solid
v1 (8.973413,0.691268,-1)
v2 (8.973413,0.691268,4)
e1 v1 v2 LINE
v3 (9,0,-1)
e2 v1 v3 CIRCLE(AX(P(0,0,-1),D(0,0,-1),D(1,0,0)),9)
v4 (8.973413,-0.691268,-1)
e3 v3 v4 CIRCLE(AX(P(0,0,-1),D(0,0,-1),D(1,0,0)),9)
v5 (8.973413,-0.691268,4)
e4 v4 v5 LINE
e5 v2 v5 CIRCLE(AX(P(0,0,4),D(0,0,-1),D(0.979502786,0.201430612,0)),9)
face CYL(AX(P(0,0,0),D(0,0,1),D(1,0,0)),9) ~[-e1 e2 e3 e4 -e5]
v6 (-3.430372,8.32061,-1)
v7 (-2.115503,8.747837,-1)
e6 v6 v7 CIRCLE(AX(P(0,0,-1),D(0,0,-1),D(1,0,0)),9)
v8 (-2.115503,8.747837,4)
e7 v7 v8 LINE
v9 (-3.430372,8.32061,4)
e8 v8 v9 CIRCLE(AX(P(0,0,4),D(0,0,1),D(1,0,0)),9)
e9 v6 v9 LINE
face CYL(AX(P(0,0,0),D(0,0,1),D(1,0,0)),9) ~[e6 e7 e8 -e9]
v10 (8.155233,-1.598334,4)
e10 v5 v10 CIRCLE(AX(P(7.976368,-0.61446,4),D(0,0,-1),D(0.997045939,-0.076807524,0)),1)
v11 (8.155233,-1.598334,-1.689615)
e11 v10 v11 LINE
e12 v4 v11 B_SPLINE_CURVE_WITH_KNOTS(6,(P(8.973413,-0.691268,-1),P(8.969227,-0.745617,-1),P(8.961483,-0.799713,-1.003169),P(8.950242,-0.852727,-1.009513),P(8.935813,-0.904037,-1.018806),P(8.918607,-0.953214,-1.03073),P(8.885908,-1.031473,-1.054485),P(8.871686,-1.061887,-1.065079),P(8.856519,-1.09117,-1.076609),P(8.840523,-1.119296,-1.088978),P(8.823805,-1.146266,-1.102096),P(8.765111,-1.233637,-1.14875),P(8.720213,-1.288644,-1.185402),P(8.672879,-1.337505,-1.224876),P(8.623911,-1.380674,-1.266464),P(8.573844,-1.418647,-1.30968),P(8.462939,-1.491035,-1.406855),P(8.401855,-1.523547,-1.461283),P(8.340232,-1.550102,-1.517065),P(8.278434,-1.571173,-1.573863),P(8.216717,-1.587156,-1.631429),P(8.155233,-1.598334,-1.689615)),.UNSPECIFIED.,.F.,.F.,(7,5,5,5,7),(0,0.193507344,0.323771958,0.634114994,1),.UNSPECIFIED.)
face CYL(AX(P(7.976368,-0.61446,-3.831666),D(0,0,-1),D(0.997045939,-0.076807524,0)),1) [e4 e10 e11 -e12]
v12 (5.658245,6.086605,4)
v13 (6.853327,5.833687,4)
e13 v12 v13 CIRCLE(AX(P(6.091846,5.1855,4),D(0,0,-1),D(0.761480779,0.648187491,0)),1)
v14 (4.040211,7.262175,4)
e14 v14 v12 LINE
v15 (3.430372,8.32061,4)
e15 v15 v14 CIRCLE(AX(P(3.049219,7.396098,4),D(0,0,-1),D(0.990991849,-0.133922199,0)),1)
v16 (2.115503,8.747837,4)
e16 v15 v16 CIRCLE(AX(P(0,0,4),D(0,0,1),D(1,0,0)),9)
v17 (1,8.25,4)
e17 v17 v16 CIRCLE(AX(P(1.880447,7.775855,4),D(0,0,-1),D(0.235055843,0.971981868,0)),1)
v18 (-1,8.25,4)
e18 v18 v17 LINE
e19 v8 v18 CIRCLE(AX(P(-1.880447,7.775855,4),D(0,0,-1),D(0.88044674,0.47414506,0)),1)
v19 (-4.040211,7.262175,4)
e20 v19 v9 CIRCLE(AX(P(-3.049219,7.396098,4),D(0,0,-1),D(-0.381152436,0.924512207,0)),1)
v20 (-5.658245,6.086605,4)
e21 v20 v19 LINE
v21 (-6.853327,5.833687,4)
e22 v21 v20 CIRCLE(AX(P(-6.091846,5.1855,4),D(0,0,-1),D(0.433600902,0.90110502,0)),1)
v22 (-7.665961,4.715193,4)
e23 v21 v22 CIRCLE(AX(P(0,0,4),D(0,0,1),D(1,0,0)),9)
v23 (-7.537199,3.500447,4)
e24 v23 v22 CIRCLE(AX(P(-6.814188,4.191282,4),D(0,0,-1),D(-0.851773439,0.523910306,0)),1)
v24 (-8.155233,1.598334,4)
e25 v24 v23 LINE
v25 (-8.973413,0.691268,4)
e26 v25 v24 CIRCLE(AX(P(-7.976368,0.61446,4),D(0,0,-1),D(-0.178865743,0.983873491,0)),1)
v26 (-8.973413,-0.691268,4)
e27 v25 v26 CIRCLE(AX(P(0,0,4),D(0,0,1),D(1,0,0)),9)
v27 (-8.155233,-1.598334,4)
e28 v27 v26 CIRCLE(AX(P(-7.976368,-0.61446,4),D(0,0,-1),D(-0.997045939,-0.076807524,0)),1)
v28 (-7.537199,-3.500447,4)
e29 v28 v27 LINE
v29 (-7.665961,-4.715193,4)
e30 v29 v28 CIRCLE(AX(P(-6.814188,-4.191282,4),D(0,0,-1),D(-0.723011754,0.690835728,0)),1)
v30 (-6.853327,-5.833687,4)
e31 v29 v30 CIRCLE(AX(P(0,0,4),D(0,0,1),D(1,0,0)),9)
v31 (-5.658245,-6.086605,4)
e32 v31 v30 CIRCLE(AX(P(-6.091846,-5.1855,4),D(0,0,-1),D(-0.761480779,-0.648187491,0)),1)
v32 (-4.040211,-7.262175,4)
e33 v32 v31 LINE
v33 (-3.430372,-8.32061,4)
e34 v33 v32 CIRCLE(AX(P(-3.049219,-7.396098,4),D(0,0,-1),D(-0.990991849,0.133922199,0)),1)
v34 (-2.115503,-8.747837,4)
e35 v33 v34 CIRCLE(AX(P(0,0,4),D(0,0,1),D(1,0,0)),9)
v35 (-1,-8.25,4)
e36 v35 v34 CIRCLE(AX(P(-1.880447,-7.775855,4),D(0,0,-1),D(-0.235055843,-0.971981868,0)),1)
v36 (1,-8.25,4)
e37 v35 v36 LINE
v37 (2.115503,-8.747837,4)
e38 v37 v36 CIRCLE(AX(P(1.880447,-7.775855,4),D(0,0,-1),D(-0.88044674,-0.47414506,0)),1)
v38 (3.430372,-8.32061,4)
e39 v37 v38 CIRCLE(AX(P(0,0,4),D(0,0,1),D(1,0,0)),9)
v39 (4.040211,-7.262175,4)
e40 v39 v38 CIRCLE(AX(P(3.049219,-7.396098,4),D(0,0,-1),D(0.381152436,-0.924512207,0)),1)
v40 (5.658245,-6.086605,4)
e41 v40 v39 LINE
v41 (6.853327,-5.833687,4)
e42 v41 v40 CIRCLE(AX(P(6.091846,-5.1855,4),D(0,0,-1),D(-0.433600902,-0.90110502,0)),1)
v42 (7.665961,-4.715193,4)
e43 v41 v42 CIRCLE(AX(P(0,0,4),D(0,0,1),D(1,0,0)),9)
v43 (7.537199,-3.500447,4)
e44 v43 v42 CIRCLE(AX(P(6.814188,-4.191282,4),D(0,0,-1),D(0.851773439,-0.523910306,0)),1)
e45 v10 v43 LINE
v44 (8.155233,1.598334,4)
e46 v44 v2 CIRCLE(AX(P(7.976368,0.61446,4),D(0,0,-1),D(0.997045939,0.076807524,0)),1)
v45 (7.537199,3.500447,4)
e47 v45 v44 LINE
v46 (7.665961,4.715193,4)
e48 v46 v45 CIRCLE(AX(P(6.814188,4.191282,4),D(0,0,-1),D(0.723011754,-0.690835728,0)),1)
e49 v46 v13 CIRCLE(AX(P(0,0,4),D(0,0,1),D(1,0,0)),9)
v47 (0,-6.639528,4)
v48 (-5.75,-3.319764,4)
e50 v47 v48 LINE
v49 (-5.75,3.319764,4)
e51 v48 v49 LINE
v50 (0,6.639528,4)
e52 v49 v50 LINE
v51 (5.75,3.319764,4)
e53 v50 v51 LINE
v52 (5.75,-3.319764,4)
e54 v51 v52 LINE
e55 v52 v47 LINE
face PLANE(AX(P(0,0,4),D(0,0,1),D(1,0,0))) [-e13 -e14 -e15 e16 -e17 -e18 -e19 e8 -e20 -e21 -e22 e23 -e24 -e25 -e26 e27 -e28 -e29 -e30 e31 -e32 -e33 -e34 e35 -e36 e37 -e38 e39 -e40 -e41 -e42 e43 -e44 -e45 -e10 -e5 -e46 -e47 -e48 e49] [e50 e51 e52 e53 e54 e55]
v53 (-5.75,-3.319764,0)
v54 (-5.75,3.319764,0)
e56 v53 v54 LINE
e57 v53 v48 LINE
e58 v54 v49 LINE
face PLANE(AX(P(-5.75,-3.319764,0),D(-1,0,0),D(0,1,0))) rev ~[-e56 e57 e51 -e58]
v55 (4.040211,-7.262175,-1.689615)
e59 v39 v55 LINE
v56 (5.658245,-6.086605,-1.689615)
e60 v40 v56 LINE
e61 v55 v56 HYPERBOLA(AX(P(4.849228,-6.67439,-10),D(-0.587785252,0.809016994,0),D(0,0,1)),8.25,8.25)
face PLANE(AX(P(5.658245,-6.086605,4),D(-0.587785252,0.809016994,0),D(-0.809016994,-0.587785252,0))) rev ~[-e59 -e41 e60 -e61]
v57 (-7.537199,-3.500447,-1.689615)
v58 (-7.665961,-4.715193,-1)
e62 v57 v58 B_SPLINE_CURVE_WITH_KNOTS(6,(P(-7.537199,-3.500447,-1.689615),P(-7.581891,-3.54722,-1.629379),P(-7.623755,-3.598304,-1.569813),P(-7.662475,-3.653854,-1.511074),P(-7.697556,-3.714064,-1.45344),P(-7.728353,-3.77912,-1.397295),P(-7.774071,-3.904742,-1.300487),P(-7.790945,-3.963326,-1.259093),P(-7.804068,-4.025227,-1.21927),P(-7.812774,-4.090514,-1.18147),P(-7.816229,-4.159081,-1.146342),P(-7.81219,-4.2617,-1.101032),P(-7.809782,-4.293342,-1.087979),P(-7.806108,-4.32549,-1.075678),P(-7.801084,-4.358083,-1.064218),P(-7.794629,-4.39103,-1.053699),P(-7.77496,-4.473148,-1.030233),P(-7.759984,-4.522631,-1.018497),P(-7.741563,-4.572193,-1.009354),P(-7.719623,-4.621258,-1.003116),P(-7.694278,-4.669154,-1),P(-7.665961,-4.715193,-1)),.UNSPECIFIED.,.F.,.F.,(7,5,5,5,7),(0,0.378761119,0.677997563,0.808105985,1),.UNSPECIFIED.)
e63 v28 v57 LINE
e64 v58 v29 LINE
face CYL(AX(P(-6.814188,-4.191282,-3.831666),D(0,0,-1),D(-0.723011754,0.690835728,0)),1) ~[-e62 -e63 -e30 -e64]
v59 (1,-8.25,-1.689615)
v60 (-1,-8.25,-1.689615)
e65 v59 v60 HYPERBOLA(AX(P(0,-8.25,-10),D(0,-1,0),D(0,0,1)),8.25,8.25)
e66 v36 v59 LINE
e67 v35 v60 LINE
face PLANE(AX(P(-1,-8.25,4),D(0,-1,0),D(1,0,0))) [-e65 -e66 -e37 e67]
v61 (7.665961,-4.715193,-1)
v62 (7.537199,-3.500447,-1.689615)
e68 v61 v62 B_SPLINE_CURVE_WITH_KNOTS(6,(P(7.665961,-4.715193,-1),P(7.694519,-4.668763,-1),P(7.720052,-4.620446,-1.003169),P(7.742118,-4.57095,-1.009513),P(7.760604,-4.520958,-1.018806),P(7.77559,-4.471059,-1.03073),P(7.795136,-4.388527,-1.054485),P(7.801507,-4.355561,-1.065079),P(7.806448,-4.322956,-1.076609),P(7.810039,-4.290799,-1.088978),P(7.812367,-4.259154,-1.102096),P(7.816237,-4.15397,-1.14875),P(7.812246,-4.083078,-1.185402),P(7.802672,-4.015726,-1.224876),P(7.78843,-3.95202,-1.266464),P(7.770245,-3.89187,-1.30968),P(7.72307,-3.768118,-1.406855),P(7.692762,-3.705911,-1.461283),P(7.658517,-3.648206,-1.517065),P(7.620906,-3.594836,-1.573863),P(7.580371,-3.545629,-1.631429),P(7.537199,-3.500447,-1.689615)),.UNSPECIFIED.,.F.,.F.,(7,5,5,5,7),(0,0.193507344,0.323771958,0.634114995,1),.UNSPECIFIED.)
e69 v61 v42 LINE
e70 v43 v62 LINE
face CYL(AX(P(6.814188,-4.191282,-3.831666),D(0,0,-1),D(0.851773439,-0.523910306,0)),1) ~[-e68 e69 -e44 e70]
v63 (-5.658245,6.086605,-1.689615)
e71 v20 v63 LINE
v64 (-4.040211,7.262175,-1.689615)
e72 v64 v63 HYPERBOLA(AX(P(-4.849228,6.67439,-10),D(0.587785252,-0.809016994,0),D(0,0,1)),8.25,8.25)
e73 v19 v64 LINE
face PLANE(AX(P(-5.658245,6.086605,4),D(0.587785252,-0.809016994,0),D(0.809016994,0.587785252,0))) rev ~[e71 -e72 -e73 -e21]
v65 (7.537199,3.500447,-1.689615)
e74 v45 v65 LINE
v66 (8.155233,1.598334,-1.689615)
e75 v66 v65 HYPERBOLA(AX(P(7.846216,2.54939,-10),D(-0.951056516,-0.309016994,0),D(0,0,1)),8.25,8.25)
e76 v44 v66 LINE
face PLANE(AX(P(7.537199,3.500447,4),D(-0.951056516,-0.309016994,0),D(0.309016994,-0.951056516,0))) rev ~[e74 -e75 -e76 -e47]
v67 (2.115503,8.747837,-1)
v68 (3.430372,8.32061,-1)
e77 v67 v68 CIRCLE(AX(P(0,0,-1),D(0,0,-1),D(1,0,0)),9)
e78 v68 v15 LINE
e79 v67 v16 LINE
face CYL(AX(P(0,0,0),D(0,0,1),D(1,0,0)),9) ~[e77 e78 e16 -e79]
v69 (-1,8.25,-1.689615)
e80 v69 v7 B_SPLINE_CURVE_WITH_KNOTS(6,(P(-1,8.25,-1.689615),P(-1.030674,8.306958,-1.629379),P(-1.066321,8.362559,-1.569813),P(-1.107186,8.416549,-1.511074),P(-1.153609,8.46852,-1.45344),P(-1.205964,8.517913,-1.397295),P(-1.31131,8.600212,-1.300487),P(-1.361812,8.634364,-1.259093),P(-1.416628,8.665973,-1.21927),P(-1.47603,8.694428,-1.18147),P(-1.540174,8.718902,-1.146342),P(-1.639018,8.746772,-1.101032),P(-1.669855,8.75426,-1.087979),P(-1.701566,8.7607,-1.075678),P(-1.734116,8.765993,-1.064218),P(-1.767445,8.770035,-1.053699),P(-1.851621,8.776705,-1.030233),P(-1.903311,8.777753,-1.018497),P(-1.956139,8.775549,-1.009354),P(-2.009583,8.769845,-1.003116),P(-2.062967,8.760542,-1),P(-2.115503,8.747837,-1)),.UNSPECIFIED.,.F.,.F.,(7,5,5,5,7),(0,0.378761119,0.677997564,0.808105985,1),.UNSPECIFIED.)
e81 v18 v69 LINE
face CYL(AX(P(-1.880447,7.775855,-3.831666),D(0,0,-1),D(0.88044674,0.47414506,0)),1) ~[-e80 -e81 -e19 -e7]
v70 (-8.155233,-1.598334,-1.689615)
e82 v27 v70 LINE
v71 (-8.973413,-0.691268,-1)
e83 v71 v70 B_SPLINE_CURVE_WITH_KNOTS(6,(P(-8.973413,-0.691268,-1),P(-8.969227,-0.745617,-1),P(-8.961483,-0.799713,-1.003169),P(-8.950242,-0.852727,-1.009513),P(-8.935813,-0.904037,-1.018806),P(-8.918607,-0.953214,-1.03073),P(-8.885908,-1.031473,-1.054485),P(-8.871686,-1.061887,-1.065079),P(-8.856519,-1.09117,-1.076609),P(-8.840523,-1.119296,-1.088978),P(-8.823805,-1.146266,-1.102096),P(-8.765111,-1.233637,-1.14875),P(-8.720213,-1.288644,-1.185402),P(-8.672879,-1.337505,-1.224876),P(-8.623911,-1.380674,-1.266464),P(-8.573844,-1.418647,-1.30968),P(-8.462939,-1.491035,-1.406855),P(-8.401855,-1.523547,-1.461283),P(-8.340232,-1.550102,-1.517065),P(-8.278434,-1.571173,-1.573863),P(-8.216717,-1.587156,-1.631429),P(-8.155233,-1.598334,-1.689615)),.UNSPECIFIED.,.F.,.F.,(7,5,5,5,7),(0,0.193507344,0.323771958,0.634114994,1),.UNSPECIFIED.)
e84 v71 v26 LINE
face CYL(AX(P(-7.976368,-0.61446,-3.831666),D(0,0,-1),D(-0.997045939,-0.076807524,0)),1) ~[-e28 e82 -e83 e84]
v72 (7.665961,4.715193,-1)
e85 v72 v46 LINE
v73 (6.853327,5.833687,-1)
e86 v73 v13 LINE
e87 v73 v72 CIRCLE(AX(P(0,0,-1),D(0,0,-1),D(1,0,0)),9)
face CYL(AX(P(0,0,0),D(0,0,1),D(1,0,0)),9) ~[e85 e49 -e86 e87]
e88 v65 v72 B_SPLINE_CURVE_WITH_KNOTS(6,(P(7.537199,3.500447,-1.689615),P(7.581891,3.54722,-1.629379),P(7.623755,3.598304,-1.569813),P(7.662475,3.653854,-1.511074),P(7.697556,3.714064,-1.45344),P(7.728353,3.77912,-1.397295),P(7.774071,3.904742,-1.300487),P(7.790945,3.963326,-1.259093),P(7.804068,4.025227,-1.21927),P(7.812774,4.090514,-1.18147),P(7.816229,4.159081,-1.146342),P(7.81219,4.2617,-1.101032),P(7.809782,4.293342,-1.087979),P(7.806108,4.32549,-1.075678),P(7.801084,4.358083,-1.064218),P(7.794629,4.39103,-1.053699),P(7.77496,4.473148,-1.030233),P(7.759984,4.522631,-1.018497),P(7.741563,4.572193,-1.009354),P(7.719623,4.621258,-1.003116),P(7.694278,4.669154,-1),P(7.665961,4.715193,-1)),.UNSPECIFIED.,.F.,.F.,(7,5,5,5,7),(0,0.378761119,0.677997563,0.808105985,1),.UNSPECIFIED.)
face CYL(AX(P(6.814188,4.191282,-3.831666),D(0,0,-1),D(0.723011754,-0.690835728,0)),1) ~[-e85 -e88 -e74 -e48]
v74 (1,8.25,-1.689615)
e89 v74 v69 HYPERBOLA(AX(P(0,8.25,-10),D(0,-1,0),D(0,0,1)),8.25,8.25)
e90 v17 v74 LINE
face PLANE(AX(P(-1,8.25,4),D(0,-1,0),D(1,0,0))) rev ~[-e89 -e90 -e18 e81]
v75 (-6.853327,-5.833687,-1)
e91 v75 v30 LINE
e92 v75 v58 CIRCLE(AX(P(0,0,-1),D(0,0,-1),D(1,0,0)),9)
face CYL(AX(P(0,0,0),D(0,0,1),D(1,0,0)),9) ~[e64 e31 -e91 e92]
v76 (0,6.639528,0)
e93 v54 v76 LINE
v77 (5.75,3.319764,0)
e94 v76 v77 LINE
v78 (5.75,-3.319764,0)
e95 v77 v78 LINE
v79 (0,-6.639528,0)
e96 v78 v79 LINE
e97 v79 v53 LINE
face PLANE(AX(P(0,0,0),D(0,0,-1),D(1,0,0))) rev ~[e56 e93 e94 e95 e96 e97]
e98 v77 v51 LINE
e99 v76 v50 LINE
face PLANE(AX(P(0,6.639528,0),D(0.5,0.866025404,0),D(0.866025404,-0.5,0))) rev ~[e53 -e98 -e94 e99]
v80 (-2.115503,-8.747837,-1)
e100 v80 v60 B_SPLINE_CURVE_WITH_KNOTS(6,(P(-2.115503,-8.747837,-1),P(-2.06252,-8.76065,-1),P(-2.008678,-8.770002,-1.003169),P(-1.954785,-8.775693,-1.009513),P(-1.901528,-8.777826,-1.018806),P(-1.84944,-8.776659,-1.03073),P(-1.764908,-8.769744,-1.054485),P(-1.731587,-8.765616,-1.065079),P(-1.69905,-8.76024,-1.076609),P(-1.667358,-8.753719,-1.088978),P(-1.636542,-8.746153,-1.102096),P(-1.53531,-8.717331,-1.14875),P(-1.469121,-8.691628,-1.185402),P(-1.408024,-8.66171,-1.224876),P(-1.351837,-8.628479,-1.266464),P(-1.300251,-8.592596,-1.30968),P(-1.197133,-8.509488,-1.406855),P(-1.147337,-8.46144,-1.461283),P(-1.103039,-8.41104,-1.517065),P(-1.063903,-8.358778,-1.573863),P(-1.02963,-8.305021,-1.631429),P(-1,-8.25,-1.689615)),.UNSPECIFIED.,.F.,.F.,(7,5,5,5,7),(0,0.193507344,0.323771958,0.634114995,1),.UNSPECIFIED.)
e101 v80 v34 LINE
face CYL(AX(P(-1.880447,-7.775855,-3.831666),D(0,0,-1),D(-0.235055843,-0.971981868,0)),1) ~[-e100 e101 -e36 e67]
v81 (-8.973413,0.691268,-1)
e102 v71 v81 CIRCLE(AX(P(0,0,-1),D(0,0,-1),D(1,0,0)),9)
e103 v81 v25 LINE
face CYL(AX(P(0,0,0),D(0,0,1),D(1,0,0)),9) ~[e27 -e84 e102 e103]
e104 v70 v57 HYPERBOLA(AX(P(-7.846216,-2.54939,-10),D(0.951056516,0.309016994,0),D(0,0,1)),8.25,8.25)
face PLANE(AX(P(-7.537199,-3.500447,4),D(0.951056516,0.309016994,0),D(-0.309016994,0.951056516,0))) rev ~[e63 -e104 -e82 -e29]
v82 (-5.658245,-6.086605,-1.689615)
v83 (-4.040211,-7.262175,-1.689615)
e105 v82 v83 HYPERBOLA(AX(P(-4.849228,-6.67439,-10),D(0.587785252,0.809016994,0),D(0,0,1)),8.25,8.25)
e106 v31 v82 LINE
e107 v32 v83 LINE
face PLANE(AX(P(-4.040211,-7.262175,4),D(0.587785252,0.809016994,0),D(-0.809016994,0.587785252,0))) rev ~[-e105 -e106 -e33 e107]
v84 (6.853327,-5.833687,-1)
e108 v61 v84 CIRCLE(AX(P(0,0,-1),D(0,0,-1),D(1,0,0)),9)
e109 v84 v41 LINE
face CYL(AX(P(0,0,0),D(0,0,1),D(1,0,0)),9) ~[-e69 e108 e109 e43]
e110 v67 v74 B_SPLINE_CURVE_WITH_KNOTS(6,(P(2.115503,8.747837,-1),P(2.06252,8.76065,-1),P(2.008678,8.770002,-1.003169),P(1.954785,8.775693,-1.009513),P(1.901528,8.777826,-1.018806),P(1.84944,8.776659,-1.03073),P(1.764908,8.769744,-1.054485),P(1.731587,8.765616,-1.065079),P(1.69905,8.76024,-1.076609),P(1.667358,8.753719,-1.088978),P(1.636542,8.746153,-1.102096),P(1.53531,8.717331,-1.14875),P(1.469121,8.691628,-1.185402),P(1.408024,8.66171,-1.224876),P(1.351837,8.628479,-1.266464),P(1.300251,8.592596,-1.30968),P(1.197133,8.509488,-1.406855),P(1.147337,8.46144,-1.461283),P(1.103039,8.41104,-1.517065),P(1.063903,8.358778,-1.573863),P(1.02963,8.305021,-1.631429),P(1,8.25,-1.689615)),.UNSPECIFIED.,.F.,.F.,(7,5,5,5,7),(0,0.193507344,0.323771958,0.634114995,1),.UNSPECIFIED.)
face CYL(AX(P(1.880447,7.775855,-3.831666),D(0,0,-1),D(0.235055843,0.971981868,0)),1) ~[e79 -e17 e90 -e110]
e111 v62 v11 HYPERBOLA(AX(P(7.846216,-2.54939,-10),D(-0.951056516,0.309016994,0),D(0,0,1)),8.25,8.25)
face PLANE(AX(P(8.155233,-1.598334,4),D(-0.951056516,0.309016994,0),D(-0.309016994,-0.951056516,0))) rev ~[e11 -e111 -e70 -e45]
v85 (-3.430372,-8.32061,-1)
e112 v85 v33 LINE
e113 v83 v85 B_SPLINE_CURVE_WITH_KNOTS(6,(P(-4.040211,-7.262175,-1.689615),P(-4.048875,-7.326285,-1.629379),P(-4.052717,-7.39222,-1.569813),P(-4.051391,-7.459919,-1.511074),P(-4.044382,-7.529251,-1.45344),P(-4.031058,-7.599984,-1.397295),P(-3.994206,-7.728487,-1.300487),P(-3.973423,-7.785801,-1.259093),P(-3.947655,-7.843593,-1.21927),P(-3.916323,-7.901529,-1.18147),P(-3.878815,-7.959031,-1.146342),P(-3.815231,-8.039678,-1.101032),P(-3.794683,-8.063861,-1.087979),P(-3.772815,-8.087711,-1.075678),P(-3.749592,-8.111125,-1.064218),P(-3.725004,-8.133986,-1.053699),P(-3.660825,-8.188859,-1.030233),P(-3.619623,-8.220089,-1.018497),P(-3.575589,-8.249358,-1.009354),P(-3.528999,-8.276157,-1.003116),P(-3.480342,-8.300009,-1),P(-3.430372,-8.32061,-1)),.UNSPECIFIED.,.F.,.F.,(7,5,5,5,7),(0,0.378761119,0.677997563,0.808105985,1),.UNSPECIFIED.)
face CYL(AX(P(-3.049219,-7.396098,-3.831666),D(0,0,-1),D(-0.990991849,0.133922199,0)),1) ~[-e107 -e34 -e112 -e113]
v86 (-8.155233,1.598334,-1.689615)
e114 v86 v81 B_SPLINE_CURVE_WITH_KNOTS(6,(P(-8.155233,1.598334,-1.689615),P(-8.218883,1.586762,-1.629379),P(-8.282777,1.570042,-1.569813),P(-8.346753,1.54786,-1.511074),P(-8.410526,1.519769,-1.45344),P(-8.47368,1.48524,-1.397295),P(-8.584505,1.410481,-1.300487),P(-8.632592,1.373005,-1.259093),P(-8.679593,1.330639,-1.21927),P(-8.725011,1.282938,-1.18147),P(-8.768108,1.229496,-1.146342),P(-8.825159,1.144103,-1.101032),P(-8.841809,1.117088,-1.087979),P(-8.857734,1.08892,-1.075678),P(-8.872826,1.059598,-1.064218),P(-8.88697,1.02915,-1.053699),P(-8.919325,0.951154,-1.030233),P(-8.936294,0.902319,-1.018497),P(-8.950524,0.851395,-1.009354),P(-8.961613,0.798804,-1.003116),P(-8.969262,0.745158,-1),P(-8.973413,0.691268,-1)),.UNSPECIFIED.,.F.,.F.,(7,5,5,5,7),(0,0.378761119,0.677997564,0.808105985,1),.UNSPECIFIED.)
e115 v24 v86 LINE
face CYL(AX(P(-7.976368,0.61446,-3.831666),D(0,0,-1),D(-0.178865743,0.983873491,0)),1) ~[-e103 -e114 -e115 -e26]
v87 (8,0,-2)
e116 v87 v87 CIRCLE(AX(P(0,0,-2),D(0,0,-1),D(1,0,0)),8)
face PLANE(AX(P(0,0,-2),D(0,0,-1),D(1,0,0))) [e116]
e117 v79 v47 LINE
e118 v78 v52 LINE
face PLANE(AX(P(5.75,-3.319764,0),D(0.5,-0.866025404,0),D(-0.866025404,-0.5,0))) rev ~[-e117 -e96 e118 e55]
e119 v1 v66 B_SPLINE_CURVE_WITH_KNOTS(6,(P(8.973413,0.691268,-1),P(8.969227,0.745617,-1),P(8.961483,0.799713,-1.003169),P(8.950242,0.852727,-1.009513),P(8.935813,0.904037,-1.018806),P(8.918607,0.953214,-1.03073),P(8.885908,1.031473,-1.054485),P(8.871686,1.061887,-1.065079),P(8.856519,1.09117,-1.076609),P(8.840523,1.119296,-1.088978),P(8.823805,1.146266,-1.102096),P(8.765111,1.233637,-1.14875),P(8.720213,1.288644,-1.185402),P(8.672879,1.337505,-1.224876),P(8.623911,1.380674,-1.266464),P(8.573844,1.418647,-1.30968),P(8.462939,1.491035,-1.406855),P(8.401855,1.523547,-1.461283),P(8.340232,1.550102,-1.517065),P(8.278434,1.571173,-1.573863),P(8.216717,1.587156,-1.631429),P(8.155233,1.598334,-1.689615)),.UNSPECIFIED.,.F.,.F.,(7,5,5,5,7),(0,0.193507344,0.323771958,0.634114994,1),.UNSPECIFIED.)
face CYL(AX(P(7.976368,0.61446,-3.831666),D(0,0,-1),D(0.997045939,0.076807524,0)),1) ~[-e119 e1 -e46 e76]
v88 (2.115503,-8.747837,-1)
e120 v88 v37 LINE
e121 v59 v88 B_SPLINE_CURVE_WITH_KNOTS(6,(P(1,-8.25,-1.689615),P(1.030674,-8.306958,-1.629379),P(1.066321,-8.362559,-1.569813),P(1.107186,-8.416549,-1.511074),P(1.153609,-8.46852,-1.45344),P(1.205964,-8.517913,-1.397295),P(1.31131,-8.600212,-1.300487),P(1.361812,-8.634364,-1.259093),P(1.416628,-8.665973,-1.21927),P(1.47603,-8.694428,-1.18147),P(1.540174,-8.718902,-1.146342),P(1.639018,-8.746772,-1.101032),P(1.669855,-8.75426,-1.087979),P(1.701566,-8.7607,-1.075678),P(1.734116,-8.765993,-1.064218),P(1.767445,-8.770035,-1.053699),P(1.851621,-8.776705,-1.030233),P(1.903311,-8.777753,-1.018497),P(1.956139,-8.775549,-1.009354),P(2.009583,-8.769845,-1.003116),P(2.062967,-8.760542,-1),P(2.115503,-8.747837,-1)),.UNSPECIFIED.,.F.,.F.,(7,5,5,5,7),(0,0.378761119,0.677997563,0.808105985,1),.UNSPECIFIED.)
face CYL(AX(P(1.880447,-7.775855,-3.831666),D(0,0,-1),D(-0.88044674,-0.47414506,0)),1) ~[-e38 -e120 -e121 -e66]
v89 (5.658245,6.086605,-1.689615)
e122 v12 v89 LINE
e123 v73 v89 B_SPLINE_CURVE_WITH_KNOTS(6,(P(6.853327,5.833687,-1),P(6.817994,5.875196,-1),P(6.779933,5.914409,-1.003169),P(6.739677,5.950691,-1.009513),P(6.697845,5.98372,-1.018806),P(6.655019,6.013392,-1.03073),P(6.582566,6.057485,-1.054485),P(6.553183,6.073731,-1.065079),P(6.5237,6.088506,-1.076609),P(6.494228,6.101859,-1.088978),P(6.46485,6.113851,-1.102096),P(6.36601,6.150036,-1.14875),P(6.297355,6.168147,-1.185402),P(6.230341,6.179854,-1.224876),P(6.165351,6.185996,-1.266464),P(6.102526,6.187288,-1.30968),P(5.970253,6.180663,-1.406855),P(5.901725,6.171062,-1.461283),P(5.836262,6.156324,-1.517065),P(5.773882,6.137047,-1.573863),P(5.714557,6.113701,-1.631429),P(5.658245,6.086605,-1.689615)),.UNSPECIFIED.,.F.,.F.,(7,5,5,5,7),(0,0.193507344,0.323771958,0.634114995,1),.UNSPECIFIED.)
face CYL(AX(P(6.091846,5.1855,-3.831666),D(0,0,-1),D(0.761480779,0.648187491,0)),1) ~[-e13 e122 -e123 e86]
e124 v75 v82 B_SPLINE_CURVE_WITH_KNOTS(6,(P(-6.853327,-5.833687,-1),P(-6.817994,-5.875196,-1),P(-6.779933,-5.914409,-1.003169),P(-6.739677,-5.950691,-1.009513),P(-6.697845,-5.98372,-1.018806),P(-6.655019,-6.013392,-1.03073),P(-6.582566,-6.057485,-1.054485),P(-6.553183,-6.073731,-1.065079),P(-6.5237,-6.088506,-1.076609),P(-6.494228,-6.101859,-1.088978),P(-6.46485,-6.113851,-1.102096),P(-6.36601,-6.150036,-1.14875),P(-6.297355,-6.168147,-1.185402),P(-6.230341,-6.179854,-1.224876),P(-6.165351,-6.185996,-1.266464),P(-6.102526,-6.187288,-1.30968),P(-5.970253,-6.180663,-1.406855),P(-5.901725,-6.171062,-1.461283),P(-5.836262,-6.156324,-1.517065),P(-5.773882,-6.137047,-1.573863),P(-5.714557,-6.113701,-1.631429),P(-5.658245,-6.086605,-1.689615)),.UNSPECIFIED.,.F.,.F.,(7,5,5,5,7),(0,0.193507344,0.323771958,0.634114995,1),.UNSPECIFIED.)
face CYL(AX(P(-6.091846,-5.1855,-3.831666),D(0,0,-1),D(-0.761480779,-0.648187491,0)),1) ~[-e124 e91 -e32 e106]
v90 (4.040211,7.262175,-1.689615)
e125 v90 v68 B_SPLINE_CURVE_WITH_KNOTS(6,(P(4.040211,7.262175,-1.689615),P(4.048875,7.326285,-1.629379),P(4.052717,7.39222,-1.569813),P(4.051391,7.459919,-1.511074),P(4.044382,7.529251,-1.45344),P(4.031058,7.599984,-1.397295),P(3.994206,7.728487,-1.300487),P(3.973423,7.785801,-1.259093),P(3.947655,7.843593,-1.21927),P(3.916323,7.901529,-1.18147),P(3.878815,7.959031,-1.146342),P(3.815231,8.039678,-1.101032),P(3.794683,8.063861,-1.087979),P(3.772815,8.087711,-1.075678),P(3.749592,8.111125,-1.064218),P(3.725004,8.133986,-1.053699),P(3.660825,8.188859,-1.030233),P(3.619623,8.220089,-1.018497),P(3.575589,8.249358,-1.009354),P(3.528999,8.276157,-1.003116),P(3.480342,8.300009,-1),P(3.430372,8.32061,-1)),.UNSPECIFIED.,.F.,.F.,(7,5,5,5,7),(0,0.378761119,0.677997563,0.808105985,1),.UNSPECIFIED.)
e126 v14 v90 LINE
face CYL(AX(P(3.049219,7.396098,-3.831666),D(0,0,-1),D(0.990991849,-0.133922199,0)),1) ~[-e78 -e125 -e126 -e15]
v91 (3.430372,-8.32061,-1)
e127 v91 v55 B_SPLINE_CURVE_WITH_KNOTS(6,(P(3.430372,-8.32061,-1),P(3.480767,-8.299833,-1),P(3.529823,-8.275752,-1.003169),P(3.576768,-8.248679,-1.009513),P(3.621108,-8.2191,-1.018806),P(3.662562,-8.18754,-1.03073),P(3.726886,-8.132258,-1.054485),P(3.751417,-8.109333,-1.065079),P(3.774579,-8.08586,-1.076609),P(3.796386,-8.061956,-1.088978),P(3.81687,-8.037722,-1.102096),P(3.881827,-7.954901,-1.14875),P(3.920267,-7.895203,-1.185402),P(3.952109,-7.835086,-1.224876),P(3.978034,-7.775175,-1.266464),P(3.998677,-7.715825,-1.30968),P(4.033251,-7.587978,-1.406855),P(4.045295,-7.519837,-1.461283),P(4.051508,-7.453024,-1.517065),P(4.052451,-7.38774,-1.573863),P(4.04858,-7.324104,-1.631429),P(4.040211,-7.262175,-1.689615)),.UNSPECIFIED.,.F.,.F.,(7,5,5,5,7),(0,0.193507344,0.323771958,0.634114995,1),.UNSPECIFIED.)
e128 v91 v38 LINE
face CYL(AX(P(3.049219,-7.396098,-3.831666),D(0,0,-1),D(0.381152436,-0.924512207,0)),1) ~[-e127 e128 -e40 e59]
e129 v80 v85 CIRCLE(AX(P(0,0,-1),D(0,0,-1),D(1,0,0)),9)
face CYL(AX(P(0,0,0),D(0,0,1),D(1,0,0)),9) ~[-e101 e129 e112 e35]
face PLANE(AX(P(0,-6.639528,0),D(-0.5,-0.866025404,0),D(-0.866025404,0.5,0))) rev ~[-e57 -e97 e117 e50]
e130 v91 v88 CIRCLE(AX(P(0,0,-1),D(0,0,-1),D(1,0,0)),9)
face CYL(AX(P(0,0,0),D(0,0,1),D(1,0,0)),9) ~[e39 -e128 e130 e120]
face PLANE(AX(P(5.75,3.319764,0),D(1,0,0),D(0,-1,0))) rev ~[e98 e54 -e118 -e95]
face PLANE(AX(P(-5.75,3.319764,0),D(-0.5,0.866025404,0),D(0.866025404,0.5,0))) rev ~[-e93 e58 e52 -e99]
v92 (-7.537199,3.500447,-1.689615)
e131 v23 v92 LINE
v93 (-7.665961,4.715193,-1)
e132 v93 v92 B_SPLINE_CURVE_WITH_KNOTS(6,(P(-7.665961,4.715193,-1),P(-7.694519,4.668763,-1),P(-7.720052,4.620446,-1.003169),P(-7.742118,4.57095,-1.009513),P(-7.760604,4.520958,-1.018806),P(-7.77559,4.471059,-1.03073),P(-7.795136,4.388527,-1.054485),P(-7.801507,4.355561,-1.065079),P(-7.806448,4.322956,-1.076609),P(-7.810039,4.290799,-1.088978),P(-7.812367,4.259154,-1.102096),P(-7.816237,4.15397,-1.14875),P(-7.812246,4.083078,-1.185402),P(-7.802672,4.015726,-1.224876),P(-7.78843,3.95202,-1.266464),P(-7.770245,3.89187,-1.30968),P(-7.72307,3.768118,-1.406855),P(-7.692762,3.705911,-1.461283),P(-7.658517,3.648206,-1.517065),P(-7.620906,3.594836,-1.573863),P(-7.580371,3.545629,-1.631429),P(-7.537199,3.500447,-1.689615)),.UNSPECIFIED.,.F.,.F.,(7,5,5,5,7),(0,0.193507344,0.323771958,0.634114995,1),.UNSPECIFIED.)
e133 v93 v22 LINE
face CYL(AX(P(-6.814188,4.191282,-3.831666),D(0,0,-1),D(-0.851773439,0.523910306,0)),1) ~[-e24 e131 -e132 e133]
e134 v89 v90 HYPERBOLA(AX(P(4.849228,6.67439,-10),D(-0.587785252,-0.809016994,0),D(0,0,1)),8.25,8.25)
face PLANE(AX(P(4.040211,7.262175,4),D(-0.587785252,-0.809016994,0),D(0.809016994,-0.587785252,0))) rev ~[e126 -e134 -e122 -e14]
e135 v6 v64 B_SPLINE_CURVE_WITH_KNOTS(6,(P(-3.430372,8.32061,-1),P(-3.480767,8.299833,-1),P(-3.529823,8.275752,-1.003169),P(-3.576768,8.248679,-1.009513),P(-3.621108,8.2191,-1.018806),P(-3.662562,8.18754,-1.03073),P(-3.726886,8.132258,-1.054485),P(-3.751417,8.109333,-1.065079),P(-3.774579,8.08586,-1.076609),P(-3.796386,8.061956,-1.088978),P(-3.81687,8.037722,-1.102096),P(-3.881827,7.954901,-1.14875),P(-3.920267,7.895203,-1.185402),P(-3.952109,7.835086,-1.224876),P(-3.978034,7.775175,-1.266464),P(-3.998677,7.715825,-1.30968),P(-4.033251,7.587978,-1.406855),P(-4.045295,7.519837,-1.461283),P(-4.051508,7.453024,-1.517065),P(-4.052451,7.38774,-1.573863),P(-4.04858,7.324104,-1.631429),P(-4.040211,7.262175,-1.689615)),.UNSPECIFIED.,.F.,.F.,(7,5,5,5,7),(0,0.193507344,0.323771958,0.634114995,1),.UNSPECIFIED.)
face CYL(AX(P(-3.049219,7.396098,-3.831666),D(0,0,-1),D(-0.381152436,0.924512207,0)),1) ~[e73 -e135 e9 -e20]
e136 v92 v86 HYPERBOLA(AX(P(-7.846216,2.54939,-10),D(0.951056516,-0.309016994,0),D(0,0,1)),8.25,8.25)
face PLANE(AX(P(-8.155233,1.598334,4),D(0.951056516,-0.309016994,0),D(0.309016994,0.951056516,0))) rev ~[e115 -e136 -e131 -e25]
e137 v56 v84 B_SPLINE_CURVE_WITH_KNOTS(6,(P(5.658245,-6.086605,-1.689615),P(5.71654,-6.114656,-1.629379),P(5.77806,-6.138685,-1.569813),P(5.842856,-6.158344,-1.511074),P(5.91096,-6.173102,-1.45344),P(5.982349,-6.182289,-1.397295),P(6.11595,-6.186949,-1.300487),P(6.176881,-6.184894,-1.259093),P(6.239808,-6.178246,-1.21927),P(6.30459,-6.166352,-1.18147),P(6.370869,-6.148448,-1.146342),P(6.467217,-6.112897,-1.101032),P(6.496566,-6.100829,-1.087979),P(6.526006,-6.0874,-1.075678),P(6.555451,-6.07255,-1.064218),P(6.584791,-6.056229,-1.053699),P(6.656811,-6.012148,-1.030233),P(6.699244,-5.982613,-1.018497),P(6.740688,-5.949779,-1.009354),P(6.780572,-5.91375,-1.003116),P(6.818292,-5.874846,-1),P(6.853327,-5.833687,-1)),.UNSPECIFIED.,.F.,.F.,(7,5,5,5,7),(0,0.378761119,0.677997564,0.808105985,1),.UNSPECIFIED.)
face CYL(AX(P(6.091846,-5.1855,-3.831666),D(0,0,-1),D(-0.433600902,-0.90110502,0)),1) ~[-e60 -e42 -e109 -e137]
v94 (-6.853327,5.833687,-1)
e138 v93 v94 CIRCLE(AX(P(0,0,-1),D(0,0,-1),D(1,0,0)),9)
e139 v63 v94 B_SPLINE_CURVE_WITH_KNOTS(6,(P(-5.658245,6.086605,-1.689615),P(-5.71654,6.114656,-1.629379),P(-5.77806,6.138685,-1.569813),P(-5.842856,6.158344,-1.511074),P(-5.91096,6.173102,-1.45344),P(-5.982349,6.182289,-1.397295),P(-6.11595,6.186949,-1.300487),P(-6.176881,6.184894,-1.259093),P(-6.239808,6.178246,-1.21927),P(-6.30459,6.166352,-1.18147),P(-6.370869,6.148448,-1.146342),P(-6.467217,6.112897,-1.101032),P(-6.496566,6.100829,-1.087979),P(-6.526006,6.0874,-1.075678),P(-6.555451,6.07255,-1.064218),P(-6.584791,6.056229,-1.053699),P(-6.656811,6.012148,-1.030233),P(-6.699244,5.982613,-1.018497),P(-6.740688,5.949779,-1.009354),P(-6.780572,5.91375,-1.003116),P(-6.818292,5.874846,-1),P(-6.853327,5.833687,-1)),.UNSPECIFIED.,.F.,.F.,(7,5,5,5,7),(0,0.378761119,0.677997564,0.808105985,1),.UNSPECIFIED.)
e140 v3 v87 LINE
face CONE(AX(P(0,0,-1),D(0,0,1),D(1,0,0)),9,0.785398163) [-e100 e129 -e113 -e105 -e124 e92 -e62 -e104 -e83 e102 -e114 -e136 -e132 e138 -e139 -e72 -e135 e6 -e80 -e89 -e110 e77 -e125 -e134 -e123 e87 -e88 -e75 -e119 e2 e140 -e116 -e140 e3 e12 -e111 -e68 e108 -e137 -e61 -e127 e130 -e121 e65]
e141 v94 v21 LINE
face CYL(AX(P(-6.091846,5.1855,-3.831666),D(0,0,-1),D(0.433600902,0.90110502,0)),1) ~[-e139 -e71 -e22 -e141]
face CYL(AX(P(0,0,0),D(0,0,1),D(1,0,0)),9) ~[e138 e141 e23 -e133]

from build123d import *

# Parameters (mm, degrees)
F0_R        = 9
F1_DEPTH    = 4
F2_R        = 9
F3_DEPTH    = 2
F4_SIZE     = 1
F5_W        = 2
F5_H        = 1.5
F6_DEPTH    = 6.001
F7_T1_DEPTH = 10.6633310907


# Not quite as in the source:
# - a fillet or chamfer that OpenCascade refuses, or shapes differently, is made with other operations: its cross-section is extruded or revolved along the edge and cut away or added


with BuildPart() as f1:
    # F0 (on Top) → F1 (new body)
    with BuildSketch(Plane.XY):
        Circle(F0_R)
        Polygon((-5.75, 3.3197640478), (0, 6.6395280957), (5.75, 3.3197640478), (5.75, -3.3197640478), (0, -6.6395280957), (-5.75, -3.3197640478), align=None, mode=Mode.SUBTRACT)
    extrude(amount=F1_DEPTH)

    # F2 (on face) → F3 (join)
    with BuildSketch(Plane(origin=(0, 0, 0), x_dir=(1, 0, 0), z_dir=(0, 0, -1))):
        Circle(F2_R)
    extrude(amount=F3_DEPTH)

    # F4
    f4_edges = [f1.edges().sort_by_distance(p)[0] for p in [
        (-9, 0, -2),
    ]]
    chamfer(f4_edges, length=F4_SIZE)

    # F5 (on face) → F6 (cut, through all)
    with BuildSketch(Plane.XY.offset(4)):
        with Locations((0, 9)):
            Rectangle(F5_W, F5_H)
        Polygon((-4.040211337, 7.2621754559), (-4.9218892155, 8.4757009474), (-6.5399232042, 7.3001304429), (-5.6582453258, 6.0866049513), align=None)
        Polygon((-7.5371992651, 3.5004467199), (-8.9637840395, 3.9639722115), (-9.5818180283, 2.0618591789), (-8.1552332538, 1.5983336873), align=None)
        Polygon((-8.1552332538, -1.5983336873), (-9.5818180283, -2.0618591789), (-8.9637840395, -3.9639722115), (-7.5371992651, -3.5004467199), align=None)
        Polygon((-5.6582453258, -6.0866049513), (-6.5399232042, -7.3001304429), (-4.9218892155, -8.4757009474), (-4.040211337, -7.2621754559), align=None)
        with Locations((0, -9)):
            Rectangle(F5_W, F5_H)
        Polygon((4.040211337, -7.2621754559), (4.9218892155, -8.4757009474), (6.5399232042, -7.3001304429), (5.6582453258, -6.0866049513), align=None)
        Polygon((7.5371992651, -3.5004467199), (8.9637840395, -3.9639722115), (9.5818180283, -2.0618591789), (8.1552332538, -1.5983336873), align=None)
        Polygon((8.1552332538, 1.5983336873), (9.5818180283, 2.0618591789), (8.9637840395, 3.9639722115), (7.5371992651, 3.5004467199), align=None)
        Polygon((5.6582453258, 6.0866049513), (6.5399232042, 7.3001304429), (4.9218892155, 8.4757009474), (4.040211337, 7.2621754559), align=None)
    extrude(amount=-F6_DEPTH, mode=Mode.SUBTRACT)

    # F7: fillet of radius 1 on 20 edges, made by hand

    # F7_s2 → F7_t1 (cut)
    with BuildSketch(Plane.XY.offset(-3.8316655453)):
        with BuildLine():
            ThreePointArc((2.1155025829, 8.7478368081), (1.4729019887, 8.6890401766), (1, 8.25))
            Line((1, 8.25), (1, 8.94427191))
            ThreePointArc((1, 8.94427191), (1.5608445705, 8.8636202664), (2.1155025829, 8.7478368081))
        make_face()
        with BuildLine():
            ThreePointArc((4.040211337, 7.2621754559), (3.9156869325, 7.8953312347), (3.4303719241, 8.3206098612))
            ThreePointArc((3.4303719241, 8.3206098612), (3.9471554914, 8.0882608469), (4.4482941268, 7.8238532298))
            Line((4.4482941268, 7.8238532298), (4.040211337, 7.2621754559))
        make_face()
        with BuildLine():
            ThreePointArc((6.8533270065, 5.8336874224), (6.2988924123, 6.1638311007), (5.6582453258, 6.0866049513))
            Line((5.6582453258, 6.0866049513), (6.0663281156, 6.6482827252))
            ThreePointArc((6.0663281156, 6.6482827252), (6.4726550576, 6.2533780075), (6.8533270065, 5.8336874224))
        make_face()
        with BuildLine():
            ThreePointArc((7.5371992651, 3.5004467199), (7.8086165348, 4.0858741136), (7.6659609501, 4.7151927544))
            ThreePointArc((7.6659609501, 4.7151927544), (7.9474763144, 4.2234606937), (8.1974910891, 3.7149885388))
            Line((8.1974910891, 3.7149885388), (7.5371992651, 3.5004467199))
        make_face()
        with BuildLine():
            ThreePointArc((8.9734134496, 0.691267721), (8.7189200259, 1.2842480452), (8.1552332538, 1.5983336873))
            Line((8.1552332538, 1.5983336873), (8.8155250779, 1.8128755062))
            ThreePointArc((8.8155250779, 1.8128755062), (8.9121313102, 1.2545578943), (8.9734134496, 0.691267721))
        make_face()
        with BuildLine():
            ThreePointArc((8.9734134496, -0.691267721), (8.7189200259, -1.2842480452), (8.1552332538, -1.5983336873))
            Line((8.1552332538, -1.5983336873), (8.8155250779, -1.8128755062))
            ThreePointArc((8.8155250779, -1.8128755062), (8.9121313102, -1.2545578943), (8.9734134496, -0.691267721))
        make_face()
        with BuildLine():
            ThreePointArc((7.6659609501, -4.7151927544), (7.8086165348, -4.0858741136), (7.5371992651, -3.5004467199))
            Line((7.5371992651, -3.5004467199), (8.1974910891, -3.7149885388))
            ThreePointArc((8.1974910891, -3.7149885388), (7.9474763144, -4.2234606937), (7.6659609501, -4.7151927544))
        make_face()
        with BuildLine():
            ThreePointArc((5.6582453258, -6.0866049513), (6.2988924123, -6.1638311007), (6.8533270065, -5.8336874224))
            ThreePointArc((6.8533270065, -5.8336874224), (6.4726550576, -6.2533780075), (6.0663281156, -6.6482827252))
            Line((6.0663281156, -6.6482827252), (5.6582453258, -6.0866049513))
        make_face()
        with BuildLine():
            ThreePointArc((3.4303719241, -8.3206098612), (3.9156869325, -7.8953312347), (4.040211337, -7.2621754559))
            Line((4.040211337, -7.2621754559), (4.4482941268, -7.8238532298))
            ThreePointArc((4.4482941268, -7.8238532298), (3.9471554914, -8.0882608469), (3.4303719241, -8.3206098612))
        make_face()
        with BuildLine():
            ThreePointArc((1, -8.25), (1.4729019887, -8.6890401766), (2.1155025829, -8.7478368081))
            ThreePointArc((2.1155025829, -8.7478368081), (1.5608445705, -8.8636202664), (1, -8.94427191))
            Line((1, -8.94427191), (1, -8.25))
        make_face()
        with BuildLine():
            ThreePointArc((-2.1155025829, -8.7478368081), (-1.4729019887, -8.6890401766), (-1, -8.25))
            Line((-1, -8.25), (-1, -8.94427191))
            ThreePointArc((-1, -8.94427191), (-1.5608445705, -8.8636202664), (-2.1155025829, -8.7478368081))
        make_face()
        with BuildLine():
            ThreePointArc((-4.040211337, -7.2621754559), (-3.9156869325, -7.8953312347), (-3.4303719241, -8.3206098612))
            ThreePointArc((-3.4303719241, -8.3206098612), (-3.9471554914, -8.0882608469), (-4.4482941268, -7.8238532298))
            Line((-4.4482941268, -7.8238532298), (-4.040211337, -7.2621754559))
        make_face()
        with BuildLine():
            ThreePointArc((-6.8533270065, -5.8336874224), (-6.2988924123, -6.1638311007), (-5.6582453258, -6.0866049513))
            Line((-5.6582453258, -6.0866049513), (-6.0663281156, -6.6482827252))
            ThreePointArc((-6.0663281156, -6.6482827252), (-6.4726550576, -6.2533780075), (-6.8533270065, -5.8336874224))
        make_face()
        with BuildLine():
            ThreePointArc((-7.5371992651, -3.5004467199), (-7.8086165348, -4.0858741136), (-7.6659609501, -4.7151927544))
            ThreePointArc((-7.6659609501, -4.7151927544), (-7.9474763144, -4.2234606937), (-8.1974910891, -3.7149885388))
            Line((-8.1974910891, -3.7149885388), (-7.5371992651, -3.5004467199))
        make_face()
        with BuildLine():
            ThreePointArc((-8.9734134496, -0.691267721), (-8.7189200259, -1.2842480452), (-8.1552332538, -1.5983336873))
            Line((-8.1552332538, -1.5983336873), (-8.8155250779, -1.8128755062))
            ThreePointArc((-8.8155250779, -1.8128755062), (-8.9121313102, -1.2545578943), (-8.9734134496, -0.691267721))
        make_face()
        with BuildLine():
            ThreePointArc((-8.1552332538, 1.5983336873), (-8.7189200259, 1.2842480452), (-8.9734134496, 0.691267721))
            ThreePointArc((-8.9734134496, 0.691267721), (-8.9121313102, 1.2545578943), (-8.8155250779, 1.8128755062))
            Line((-8.8155250779, 1.8128755062), (-8.1552332538, 1.5983336873))
        make_face()
        with BuildLine():
            ThreePointArc((-7.6659609501, 4.7151927544), (-7.8086165348, 4.0858741136), (-7.5371992651, 3.5004467199))
            Line((-7.5371992651, 3.5004467199), (-8.1974910891, 3.7149885388))
            ThreePointArc((-8.1974910891, 3.7149885388), (-7.9474763144, 4.2234606937), (-7.6659609501, 4.7151927544))
        make_face()
        with BuildLine():
            ThreePointArc((-5.6582453258, 6.0866049513), (-6.2988924123, 6.1638311007), (-6.8533270065, 5.8336874224))
            ThreePointArc((-6.8533270065, 5.8336874224), (-6.4726550576, 6.2533780075), (-6.0663281156, 6.6482827252))
            Line((-6.0663281156, 6.6482827252), (-5.6582453258, 6.0866049513))
        make_face()
        with BuildLine():
            ThreePointArc((-3.4303719241, 8.3206098612), (-3.9156869325, 7.8953312347), (-4.040211337, 7.2621754559))
            Line((-4.040211337, 7.2621754559), (-4.4482941268, 7.8238532298))
            ThreePointArc((-4.4482941268, 7.8238532298), (-3.9471554914, 8.0882608469), (-3.4303719241, 8.3206098612))
        make_face()
        with BuildLine():
            ThreePointArc((-1, 8.25), (-1.4729019887, 8.6890401766), (-2.1155025829, 8.7478368081))
            ThreePointArc((-2.1155025829, 8.7478368081), (-1.5608445705, 8.8636202664), (-1, 8.94427191))
            Line((-1, 8.94427191), (-1, 8.25))
        make_face()
    extrude(amount=F7_T1_DEPTH, mode=Mode.SUBTRACT)


solid = f1.part
